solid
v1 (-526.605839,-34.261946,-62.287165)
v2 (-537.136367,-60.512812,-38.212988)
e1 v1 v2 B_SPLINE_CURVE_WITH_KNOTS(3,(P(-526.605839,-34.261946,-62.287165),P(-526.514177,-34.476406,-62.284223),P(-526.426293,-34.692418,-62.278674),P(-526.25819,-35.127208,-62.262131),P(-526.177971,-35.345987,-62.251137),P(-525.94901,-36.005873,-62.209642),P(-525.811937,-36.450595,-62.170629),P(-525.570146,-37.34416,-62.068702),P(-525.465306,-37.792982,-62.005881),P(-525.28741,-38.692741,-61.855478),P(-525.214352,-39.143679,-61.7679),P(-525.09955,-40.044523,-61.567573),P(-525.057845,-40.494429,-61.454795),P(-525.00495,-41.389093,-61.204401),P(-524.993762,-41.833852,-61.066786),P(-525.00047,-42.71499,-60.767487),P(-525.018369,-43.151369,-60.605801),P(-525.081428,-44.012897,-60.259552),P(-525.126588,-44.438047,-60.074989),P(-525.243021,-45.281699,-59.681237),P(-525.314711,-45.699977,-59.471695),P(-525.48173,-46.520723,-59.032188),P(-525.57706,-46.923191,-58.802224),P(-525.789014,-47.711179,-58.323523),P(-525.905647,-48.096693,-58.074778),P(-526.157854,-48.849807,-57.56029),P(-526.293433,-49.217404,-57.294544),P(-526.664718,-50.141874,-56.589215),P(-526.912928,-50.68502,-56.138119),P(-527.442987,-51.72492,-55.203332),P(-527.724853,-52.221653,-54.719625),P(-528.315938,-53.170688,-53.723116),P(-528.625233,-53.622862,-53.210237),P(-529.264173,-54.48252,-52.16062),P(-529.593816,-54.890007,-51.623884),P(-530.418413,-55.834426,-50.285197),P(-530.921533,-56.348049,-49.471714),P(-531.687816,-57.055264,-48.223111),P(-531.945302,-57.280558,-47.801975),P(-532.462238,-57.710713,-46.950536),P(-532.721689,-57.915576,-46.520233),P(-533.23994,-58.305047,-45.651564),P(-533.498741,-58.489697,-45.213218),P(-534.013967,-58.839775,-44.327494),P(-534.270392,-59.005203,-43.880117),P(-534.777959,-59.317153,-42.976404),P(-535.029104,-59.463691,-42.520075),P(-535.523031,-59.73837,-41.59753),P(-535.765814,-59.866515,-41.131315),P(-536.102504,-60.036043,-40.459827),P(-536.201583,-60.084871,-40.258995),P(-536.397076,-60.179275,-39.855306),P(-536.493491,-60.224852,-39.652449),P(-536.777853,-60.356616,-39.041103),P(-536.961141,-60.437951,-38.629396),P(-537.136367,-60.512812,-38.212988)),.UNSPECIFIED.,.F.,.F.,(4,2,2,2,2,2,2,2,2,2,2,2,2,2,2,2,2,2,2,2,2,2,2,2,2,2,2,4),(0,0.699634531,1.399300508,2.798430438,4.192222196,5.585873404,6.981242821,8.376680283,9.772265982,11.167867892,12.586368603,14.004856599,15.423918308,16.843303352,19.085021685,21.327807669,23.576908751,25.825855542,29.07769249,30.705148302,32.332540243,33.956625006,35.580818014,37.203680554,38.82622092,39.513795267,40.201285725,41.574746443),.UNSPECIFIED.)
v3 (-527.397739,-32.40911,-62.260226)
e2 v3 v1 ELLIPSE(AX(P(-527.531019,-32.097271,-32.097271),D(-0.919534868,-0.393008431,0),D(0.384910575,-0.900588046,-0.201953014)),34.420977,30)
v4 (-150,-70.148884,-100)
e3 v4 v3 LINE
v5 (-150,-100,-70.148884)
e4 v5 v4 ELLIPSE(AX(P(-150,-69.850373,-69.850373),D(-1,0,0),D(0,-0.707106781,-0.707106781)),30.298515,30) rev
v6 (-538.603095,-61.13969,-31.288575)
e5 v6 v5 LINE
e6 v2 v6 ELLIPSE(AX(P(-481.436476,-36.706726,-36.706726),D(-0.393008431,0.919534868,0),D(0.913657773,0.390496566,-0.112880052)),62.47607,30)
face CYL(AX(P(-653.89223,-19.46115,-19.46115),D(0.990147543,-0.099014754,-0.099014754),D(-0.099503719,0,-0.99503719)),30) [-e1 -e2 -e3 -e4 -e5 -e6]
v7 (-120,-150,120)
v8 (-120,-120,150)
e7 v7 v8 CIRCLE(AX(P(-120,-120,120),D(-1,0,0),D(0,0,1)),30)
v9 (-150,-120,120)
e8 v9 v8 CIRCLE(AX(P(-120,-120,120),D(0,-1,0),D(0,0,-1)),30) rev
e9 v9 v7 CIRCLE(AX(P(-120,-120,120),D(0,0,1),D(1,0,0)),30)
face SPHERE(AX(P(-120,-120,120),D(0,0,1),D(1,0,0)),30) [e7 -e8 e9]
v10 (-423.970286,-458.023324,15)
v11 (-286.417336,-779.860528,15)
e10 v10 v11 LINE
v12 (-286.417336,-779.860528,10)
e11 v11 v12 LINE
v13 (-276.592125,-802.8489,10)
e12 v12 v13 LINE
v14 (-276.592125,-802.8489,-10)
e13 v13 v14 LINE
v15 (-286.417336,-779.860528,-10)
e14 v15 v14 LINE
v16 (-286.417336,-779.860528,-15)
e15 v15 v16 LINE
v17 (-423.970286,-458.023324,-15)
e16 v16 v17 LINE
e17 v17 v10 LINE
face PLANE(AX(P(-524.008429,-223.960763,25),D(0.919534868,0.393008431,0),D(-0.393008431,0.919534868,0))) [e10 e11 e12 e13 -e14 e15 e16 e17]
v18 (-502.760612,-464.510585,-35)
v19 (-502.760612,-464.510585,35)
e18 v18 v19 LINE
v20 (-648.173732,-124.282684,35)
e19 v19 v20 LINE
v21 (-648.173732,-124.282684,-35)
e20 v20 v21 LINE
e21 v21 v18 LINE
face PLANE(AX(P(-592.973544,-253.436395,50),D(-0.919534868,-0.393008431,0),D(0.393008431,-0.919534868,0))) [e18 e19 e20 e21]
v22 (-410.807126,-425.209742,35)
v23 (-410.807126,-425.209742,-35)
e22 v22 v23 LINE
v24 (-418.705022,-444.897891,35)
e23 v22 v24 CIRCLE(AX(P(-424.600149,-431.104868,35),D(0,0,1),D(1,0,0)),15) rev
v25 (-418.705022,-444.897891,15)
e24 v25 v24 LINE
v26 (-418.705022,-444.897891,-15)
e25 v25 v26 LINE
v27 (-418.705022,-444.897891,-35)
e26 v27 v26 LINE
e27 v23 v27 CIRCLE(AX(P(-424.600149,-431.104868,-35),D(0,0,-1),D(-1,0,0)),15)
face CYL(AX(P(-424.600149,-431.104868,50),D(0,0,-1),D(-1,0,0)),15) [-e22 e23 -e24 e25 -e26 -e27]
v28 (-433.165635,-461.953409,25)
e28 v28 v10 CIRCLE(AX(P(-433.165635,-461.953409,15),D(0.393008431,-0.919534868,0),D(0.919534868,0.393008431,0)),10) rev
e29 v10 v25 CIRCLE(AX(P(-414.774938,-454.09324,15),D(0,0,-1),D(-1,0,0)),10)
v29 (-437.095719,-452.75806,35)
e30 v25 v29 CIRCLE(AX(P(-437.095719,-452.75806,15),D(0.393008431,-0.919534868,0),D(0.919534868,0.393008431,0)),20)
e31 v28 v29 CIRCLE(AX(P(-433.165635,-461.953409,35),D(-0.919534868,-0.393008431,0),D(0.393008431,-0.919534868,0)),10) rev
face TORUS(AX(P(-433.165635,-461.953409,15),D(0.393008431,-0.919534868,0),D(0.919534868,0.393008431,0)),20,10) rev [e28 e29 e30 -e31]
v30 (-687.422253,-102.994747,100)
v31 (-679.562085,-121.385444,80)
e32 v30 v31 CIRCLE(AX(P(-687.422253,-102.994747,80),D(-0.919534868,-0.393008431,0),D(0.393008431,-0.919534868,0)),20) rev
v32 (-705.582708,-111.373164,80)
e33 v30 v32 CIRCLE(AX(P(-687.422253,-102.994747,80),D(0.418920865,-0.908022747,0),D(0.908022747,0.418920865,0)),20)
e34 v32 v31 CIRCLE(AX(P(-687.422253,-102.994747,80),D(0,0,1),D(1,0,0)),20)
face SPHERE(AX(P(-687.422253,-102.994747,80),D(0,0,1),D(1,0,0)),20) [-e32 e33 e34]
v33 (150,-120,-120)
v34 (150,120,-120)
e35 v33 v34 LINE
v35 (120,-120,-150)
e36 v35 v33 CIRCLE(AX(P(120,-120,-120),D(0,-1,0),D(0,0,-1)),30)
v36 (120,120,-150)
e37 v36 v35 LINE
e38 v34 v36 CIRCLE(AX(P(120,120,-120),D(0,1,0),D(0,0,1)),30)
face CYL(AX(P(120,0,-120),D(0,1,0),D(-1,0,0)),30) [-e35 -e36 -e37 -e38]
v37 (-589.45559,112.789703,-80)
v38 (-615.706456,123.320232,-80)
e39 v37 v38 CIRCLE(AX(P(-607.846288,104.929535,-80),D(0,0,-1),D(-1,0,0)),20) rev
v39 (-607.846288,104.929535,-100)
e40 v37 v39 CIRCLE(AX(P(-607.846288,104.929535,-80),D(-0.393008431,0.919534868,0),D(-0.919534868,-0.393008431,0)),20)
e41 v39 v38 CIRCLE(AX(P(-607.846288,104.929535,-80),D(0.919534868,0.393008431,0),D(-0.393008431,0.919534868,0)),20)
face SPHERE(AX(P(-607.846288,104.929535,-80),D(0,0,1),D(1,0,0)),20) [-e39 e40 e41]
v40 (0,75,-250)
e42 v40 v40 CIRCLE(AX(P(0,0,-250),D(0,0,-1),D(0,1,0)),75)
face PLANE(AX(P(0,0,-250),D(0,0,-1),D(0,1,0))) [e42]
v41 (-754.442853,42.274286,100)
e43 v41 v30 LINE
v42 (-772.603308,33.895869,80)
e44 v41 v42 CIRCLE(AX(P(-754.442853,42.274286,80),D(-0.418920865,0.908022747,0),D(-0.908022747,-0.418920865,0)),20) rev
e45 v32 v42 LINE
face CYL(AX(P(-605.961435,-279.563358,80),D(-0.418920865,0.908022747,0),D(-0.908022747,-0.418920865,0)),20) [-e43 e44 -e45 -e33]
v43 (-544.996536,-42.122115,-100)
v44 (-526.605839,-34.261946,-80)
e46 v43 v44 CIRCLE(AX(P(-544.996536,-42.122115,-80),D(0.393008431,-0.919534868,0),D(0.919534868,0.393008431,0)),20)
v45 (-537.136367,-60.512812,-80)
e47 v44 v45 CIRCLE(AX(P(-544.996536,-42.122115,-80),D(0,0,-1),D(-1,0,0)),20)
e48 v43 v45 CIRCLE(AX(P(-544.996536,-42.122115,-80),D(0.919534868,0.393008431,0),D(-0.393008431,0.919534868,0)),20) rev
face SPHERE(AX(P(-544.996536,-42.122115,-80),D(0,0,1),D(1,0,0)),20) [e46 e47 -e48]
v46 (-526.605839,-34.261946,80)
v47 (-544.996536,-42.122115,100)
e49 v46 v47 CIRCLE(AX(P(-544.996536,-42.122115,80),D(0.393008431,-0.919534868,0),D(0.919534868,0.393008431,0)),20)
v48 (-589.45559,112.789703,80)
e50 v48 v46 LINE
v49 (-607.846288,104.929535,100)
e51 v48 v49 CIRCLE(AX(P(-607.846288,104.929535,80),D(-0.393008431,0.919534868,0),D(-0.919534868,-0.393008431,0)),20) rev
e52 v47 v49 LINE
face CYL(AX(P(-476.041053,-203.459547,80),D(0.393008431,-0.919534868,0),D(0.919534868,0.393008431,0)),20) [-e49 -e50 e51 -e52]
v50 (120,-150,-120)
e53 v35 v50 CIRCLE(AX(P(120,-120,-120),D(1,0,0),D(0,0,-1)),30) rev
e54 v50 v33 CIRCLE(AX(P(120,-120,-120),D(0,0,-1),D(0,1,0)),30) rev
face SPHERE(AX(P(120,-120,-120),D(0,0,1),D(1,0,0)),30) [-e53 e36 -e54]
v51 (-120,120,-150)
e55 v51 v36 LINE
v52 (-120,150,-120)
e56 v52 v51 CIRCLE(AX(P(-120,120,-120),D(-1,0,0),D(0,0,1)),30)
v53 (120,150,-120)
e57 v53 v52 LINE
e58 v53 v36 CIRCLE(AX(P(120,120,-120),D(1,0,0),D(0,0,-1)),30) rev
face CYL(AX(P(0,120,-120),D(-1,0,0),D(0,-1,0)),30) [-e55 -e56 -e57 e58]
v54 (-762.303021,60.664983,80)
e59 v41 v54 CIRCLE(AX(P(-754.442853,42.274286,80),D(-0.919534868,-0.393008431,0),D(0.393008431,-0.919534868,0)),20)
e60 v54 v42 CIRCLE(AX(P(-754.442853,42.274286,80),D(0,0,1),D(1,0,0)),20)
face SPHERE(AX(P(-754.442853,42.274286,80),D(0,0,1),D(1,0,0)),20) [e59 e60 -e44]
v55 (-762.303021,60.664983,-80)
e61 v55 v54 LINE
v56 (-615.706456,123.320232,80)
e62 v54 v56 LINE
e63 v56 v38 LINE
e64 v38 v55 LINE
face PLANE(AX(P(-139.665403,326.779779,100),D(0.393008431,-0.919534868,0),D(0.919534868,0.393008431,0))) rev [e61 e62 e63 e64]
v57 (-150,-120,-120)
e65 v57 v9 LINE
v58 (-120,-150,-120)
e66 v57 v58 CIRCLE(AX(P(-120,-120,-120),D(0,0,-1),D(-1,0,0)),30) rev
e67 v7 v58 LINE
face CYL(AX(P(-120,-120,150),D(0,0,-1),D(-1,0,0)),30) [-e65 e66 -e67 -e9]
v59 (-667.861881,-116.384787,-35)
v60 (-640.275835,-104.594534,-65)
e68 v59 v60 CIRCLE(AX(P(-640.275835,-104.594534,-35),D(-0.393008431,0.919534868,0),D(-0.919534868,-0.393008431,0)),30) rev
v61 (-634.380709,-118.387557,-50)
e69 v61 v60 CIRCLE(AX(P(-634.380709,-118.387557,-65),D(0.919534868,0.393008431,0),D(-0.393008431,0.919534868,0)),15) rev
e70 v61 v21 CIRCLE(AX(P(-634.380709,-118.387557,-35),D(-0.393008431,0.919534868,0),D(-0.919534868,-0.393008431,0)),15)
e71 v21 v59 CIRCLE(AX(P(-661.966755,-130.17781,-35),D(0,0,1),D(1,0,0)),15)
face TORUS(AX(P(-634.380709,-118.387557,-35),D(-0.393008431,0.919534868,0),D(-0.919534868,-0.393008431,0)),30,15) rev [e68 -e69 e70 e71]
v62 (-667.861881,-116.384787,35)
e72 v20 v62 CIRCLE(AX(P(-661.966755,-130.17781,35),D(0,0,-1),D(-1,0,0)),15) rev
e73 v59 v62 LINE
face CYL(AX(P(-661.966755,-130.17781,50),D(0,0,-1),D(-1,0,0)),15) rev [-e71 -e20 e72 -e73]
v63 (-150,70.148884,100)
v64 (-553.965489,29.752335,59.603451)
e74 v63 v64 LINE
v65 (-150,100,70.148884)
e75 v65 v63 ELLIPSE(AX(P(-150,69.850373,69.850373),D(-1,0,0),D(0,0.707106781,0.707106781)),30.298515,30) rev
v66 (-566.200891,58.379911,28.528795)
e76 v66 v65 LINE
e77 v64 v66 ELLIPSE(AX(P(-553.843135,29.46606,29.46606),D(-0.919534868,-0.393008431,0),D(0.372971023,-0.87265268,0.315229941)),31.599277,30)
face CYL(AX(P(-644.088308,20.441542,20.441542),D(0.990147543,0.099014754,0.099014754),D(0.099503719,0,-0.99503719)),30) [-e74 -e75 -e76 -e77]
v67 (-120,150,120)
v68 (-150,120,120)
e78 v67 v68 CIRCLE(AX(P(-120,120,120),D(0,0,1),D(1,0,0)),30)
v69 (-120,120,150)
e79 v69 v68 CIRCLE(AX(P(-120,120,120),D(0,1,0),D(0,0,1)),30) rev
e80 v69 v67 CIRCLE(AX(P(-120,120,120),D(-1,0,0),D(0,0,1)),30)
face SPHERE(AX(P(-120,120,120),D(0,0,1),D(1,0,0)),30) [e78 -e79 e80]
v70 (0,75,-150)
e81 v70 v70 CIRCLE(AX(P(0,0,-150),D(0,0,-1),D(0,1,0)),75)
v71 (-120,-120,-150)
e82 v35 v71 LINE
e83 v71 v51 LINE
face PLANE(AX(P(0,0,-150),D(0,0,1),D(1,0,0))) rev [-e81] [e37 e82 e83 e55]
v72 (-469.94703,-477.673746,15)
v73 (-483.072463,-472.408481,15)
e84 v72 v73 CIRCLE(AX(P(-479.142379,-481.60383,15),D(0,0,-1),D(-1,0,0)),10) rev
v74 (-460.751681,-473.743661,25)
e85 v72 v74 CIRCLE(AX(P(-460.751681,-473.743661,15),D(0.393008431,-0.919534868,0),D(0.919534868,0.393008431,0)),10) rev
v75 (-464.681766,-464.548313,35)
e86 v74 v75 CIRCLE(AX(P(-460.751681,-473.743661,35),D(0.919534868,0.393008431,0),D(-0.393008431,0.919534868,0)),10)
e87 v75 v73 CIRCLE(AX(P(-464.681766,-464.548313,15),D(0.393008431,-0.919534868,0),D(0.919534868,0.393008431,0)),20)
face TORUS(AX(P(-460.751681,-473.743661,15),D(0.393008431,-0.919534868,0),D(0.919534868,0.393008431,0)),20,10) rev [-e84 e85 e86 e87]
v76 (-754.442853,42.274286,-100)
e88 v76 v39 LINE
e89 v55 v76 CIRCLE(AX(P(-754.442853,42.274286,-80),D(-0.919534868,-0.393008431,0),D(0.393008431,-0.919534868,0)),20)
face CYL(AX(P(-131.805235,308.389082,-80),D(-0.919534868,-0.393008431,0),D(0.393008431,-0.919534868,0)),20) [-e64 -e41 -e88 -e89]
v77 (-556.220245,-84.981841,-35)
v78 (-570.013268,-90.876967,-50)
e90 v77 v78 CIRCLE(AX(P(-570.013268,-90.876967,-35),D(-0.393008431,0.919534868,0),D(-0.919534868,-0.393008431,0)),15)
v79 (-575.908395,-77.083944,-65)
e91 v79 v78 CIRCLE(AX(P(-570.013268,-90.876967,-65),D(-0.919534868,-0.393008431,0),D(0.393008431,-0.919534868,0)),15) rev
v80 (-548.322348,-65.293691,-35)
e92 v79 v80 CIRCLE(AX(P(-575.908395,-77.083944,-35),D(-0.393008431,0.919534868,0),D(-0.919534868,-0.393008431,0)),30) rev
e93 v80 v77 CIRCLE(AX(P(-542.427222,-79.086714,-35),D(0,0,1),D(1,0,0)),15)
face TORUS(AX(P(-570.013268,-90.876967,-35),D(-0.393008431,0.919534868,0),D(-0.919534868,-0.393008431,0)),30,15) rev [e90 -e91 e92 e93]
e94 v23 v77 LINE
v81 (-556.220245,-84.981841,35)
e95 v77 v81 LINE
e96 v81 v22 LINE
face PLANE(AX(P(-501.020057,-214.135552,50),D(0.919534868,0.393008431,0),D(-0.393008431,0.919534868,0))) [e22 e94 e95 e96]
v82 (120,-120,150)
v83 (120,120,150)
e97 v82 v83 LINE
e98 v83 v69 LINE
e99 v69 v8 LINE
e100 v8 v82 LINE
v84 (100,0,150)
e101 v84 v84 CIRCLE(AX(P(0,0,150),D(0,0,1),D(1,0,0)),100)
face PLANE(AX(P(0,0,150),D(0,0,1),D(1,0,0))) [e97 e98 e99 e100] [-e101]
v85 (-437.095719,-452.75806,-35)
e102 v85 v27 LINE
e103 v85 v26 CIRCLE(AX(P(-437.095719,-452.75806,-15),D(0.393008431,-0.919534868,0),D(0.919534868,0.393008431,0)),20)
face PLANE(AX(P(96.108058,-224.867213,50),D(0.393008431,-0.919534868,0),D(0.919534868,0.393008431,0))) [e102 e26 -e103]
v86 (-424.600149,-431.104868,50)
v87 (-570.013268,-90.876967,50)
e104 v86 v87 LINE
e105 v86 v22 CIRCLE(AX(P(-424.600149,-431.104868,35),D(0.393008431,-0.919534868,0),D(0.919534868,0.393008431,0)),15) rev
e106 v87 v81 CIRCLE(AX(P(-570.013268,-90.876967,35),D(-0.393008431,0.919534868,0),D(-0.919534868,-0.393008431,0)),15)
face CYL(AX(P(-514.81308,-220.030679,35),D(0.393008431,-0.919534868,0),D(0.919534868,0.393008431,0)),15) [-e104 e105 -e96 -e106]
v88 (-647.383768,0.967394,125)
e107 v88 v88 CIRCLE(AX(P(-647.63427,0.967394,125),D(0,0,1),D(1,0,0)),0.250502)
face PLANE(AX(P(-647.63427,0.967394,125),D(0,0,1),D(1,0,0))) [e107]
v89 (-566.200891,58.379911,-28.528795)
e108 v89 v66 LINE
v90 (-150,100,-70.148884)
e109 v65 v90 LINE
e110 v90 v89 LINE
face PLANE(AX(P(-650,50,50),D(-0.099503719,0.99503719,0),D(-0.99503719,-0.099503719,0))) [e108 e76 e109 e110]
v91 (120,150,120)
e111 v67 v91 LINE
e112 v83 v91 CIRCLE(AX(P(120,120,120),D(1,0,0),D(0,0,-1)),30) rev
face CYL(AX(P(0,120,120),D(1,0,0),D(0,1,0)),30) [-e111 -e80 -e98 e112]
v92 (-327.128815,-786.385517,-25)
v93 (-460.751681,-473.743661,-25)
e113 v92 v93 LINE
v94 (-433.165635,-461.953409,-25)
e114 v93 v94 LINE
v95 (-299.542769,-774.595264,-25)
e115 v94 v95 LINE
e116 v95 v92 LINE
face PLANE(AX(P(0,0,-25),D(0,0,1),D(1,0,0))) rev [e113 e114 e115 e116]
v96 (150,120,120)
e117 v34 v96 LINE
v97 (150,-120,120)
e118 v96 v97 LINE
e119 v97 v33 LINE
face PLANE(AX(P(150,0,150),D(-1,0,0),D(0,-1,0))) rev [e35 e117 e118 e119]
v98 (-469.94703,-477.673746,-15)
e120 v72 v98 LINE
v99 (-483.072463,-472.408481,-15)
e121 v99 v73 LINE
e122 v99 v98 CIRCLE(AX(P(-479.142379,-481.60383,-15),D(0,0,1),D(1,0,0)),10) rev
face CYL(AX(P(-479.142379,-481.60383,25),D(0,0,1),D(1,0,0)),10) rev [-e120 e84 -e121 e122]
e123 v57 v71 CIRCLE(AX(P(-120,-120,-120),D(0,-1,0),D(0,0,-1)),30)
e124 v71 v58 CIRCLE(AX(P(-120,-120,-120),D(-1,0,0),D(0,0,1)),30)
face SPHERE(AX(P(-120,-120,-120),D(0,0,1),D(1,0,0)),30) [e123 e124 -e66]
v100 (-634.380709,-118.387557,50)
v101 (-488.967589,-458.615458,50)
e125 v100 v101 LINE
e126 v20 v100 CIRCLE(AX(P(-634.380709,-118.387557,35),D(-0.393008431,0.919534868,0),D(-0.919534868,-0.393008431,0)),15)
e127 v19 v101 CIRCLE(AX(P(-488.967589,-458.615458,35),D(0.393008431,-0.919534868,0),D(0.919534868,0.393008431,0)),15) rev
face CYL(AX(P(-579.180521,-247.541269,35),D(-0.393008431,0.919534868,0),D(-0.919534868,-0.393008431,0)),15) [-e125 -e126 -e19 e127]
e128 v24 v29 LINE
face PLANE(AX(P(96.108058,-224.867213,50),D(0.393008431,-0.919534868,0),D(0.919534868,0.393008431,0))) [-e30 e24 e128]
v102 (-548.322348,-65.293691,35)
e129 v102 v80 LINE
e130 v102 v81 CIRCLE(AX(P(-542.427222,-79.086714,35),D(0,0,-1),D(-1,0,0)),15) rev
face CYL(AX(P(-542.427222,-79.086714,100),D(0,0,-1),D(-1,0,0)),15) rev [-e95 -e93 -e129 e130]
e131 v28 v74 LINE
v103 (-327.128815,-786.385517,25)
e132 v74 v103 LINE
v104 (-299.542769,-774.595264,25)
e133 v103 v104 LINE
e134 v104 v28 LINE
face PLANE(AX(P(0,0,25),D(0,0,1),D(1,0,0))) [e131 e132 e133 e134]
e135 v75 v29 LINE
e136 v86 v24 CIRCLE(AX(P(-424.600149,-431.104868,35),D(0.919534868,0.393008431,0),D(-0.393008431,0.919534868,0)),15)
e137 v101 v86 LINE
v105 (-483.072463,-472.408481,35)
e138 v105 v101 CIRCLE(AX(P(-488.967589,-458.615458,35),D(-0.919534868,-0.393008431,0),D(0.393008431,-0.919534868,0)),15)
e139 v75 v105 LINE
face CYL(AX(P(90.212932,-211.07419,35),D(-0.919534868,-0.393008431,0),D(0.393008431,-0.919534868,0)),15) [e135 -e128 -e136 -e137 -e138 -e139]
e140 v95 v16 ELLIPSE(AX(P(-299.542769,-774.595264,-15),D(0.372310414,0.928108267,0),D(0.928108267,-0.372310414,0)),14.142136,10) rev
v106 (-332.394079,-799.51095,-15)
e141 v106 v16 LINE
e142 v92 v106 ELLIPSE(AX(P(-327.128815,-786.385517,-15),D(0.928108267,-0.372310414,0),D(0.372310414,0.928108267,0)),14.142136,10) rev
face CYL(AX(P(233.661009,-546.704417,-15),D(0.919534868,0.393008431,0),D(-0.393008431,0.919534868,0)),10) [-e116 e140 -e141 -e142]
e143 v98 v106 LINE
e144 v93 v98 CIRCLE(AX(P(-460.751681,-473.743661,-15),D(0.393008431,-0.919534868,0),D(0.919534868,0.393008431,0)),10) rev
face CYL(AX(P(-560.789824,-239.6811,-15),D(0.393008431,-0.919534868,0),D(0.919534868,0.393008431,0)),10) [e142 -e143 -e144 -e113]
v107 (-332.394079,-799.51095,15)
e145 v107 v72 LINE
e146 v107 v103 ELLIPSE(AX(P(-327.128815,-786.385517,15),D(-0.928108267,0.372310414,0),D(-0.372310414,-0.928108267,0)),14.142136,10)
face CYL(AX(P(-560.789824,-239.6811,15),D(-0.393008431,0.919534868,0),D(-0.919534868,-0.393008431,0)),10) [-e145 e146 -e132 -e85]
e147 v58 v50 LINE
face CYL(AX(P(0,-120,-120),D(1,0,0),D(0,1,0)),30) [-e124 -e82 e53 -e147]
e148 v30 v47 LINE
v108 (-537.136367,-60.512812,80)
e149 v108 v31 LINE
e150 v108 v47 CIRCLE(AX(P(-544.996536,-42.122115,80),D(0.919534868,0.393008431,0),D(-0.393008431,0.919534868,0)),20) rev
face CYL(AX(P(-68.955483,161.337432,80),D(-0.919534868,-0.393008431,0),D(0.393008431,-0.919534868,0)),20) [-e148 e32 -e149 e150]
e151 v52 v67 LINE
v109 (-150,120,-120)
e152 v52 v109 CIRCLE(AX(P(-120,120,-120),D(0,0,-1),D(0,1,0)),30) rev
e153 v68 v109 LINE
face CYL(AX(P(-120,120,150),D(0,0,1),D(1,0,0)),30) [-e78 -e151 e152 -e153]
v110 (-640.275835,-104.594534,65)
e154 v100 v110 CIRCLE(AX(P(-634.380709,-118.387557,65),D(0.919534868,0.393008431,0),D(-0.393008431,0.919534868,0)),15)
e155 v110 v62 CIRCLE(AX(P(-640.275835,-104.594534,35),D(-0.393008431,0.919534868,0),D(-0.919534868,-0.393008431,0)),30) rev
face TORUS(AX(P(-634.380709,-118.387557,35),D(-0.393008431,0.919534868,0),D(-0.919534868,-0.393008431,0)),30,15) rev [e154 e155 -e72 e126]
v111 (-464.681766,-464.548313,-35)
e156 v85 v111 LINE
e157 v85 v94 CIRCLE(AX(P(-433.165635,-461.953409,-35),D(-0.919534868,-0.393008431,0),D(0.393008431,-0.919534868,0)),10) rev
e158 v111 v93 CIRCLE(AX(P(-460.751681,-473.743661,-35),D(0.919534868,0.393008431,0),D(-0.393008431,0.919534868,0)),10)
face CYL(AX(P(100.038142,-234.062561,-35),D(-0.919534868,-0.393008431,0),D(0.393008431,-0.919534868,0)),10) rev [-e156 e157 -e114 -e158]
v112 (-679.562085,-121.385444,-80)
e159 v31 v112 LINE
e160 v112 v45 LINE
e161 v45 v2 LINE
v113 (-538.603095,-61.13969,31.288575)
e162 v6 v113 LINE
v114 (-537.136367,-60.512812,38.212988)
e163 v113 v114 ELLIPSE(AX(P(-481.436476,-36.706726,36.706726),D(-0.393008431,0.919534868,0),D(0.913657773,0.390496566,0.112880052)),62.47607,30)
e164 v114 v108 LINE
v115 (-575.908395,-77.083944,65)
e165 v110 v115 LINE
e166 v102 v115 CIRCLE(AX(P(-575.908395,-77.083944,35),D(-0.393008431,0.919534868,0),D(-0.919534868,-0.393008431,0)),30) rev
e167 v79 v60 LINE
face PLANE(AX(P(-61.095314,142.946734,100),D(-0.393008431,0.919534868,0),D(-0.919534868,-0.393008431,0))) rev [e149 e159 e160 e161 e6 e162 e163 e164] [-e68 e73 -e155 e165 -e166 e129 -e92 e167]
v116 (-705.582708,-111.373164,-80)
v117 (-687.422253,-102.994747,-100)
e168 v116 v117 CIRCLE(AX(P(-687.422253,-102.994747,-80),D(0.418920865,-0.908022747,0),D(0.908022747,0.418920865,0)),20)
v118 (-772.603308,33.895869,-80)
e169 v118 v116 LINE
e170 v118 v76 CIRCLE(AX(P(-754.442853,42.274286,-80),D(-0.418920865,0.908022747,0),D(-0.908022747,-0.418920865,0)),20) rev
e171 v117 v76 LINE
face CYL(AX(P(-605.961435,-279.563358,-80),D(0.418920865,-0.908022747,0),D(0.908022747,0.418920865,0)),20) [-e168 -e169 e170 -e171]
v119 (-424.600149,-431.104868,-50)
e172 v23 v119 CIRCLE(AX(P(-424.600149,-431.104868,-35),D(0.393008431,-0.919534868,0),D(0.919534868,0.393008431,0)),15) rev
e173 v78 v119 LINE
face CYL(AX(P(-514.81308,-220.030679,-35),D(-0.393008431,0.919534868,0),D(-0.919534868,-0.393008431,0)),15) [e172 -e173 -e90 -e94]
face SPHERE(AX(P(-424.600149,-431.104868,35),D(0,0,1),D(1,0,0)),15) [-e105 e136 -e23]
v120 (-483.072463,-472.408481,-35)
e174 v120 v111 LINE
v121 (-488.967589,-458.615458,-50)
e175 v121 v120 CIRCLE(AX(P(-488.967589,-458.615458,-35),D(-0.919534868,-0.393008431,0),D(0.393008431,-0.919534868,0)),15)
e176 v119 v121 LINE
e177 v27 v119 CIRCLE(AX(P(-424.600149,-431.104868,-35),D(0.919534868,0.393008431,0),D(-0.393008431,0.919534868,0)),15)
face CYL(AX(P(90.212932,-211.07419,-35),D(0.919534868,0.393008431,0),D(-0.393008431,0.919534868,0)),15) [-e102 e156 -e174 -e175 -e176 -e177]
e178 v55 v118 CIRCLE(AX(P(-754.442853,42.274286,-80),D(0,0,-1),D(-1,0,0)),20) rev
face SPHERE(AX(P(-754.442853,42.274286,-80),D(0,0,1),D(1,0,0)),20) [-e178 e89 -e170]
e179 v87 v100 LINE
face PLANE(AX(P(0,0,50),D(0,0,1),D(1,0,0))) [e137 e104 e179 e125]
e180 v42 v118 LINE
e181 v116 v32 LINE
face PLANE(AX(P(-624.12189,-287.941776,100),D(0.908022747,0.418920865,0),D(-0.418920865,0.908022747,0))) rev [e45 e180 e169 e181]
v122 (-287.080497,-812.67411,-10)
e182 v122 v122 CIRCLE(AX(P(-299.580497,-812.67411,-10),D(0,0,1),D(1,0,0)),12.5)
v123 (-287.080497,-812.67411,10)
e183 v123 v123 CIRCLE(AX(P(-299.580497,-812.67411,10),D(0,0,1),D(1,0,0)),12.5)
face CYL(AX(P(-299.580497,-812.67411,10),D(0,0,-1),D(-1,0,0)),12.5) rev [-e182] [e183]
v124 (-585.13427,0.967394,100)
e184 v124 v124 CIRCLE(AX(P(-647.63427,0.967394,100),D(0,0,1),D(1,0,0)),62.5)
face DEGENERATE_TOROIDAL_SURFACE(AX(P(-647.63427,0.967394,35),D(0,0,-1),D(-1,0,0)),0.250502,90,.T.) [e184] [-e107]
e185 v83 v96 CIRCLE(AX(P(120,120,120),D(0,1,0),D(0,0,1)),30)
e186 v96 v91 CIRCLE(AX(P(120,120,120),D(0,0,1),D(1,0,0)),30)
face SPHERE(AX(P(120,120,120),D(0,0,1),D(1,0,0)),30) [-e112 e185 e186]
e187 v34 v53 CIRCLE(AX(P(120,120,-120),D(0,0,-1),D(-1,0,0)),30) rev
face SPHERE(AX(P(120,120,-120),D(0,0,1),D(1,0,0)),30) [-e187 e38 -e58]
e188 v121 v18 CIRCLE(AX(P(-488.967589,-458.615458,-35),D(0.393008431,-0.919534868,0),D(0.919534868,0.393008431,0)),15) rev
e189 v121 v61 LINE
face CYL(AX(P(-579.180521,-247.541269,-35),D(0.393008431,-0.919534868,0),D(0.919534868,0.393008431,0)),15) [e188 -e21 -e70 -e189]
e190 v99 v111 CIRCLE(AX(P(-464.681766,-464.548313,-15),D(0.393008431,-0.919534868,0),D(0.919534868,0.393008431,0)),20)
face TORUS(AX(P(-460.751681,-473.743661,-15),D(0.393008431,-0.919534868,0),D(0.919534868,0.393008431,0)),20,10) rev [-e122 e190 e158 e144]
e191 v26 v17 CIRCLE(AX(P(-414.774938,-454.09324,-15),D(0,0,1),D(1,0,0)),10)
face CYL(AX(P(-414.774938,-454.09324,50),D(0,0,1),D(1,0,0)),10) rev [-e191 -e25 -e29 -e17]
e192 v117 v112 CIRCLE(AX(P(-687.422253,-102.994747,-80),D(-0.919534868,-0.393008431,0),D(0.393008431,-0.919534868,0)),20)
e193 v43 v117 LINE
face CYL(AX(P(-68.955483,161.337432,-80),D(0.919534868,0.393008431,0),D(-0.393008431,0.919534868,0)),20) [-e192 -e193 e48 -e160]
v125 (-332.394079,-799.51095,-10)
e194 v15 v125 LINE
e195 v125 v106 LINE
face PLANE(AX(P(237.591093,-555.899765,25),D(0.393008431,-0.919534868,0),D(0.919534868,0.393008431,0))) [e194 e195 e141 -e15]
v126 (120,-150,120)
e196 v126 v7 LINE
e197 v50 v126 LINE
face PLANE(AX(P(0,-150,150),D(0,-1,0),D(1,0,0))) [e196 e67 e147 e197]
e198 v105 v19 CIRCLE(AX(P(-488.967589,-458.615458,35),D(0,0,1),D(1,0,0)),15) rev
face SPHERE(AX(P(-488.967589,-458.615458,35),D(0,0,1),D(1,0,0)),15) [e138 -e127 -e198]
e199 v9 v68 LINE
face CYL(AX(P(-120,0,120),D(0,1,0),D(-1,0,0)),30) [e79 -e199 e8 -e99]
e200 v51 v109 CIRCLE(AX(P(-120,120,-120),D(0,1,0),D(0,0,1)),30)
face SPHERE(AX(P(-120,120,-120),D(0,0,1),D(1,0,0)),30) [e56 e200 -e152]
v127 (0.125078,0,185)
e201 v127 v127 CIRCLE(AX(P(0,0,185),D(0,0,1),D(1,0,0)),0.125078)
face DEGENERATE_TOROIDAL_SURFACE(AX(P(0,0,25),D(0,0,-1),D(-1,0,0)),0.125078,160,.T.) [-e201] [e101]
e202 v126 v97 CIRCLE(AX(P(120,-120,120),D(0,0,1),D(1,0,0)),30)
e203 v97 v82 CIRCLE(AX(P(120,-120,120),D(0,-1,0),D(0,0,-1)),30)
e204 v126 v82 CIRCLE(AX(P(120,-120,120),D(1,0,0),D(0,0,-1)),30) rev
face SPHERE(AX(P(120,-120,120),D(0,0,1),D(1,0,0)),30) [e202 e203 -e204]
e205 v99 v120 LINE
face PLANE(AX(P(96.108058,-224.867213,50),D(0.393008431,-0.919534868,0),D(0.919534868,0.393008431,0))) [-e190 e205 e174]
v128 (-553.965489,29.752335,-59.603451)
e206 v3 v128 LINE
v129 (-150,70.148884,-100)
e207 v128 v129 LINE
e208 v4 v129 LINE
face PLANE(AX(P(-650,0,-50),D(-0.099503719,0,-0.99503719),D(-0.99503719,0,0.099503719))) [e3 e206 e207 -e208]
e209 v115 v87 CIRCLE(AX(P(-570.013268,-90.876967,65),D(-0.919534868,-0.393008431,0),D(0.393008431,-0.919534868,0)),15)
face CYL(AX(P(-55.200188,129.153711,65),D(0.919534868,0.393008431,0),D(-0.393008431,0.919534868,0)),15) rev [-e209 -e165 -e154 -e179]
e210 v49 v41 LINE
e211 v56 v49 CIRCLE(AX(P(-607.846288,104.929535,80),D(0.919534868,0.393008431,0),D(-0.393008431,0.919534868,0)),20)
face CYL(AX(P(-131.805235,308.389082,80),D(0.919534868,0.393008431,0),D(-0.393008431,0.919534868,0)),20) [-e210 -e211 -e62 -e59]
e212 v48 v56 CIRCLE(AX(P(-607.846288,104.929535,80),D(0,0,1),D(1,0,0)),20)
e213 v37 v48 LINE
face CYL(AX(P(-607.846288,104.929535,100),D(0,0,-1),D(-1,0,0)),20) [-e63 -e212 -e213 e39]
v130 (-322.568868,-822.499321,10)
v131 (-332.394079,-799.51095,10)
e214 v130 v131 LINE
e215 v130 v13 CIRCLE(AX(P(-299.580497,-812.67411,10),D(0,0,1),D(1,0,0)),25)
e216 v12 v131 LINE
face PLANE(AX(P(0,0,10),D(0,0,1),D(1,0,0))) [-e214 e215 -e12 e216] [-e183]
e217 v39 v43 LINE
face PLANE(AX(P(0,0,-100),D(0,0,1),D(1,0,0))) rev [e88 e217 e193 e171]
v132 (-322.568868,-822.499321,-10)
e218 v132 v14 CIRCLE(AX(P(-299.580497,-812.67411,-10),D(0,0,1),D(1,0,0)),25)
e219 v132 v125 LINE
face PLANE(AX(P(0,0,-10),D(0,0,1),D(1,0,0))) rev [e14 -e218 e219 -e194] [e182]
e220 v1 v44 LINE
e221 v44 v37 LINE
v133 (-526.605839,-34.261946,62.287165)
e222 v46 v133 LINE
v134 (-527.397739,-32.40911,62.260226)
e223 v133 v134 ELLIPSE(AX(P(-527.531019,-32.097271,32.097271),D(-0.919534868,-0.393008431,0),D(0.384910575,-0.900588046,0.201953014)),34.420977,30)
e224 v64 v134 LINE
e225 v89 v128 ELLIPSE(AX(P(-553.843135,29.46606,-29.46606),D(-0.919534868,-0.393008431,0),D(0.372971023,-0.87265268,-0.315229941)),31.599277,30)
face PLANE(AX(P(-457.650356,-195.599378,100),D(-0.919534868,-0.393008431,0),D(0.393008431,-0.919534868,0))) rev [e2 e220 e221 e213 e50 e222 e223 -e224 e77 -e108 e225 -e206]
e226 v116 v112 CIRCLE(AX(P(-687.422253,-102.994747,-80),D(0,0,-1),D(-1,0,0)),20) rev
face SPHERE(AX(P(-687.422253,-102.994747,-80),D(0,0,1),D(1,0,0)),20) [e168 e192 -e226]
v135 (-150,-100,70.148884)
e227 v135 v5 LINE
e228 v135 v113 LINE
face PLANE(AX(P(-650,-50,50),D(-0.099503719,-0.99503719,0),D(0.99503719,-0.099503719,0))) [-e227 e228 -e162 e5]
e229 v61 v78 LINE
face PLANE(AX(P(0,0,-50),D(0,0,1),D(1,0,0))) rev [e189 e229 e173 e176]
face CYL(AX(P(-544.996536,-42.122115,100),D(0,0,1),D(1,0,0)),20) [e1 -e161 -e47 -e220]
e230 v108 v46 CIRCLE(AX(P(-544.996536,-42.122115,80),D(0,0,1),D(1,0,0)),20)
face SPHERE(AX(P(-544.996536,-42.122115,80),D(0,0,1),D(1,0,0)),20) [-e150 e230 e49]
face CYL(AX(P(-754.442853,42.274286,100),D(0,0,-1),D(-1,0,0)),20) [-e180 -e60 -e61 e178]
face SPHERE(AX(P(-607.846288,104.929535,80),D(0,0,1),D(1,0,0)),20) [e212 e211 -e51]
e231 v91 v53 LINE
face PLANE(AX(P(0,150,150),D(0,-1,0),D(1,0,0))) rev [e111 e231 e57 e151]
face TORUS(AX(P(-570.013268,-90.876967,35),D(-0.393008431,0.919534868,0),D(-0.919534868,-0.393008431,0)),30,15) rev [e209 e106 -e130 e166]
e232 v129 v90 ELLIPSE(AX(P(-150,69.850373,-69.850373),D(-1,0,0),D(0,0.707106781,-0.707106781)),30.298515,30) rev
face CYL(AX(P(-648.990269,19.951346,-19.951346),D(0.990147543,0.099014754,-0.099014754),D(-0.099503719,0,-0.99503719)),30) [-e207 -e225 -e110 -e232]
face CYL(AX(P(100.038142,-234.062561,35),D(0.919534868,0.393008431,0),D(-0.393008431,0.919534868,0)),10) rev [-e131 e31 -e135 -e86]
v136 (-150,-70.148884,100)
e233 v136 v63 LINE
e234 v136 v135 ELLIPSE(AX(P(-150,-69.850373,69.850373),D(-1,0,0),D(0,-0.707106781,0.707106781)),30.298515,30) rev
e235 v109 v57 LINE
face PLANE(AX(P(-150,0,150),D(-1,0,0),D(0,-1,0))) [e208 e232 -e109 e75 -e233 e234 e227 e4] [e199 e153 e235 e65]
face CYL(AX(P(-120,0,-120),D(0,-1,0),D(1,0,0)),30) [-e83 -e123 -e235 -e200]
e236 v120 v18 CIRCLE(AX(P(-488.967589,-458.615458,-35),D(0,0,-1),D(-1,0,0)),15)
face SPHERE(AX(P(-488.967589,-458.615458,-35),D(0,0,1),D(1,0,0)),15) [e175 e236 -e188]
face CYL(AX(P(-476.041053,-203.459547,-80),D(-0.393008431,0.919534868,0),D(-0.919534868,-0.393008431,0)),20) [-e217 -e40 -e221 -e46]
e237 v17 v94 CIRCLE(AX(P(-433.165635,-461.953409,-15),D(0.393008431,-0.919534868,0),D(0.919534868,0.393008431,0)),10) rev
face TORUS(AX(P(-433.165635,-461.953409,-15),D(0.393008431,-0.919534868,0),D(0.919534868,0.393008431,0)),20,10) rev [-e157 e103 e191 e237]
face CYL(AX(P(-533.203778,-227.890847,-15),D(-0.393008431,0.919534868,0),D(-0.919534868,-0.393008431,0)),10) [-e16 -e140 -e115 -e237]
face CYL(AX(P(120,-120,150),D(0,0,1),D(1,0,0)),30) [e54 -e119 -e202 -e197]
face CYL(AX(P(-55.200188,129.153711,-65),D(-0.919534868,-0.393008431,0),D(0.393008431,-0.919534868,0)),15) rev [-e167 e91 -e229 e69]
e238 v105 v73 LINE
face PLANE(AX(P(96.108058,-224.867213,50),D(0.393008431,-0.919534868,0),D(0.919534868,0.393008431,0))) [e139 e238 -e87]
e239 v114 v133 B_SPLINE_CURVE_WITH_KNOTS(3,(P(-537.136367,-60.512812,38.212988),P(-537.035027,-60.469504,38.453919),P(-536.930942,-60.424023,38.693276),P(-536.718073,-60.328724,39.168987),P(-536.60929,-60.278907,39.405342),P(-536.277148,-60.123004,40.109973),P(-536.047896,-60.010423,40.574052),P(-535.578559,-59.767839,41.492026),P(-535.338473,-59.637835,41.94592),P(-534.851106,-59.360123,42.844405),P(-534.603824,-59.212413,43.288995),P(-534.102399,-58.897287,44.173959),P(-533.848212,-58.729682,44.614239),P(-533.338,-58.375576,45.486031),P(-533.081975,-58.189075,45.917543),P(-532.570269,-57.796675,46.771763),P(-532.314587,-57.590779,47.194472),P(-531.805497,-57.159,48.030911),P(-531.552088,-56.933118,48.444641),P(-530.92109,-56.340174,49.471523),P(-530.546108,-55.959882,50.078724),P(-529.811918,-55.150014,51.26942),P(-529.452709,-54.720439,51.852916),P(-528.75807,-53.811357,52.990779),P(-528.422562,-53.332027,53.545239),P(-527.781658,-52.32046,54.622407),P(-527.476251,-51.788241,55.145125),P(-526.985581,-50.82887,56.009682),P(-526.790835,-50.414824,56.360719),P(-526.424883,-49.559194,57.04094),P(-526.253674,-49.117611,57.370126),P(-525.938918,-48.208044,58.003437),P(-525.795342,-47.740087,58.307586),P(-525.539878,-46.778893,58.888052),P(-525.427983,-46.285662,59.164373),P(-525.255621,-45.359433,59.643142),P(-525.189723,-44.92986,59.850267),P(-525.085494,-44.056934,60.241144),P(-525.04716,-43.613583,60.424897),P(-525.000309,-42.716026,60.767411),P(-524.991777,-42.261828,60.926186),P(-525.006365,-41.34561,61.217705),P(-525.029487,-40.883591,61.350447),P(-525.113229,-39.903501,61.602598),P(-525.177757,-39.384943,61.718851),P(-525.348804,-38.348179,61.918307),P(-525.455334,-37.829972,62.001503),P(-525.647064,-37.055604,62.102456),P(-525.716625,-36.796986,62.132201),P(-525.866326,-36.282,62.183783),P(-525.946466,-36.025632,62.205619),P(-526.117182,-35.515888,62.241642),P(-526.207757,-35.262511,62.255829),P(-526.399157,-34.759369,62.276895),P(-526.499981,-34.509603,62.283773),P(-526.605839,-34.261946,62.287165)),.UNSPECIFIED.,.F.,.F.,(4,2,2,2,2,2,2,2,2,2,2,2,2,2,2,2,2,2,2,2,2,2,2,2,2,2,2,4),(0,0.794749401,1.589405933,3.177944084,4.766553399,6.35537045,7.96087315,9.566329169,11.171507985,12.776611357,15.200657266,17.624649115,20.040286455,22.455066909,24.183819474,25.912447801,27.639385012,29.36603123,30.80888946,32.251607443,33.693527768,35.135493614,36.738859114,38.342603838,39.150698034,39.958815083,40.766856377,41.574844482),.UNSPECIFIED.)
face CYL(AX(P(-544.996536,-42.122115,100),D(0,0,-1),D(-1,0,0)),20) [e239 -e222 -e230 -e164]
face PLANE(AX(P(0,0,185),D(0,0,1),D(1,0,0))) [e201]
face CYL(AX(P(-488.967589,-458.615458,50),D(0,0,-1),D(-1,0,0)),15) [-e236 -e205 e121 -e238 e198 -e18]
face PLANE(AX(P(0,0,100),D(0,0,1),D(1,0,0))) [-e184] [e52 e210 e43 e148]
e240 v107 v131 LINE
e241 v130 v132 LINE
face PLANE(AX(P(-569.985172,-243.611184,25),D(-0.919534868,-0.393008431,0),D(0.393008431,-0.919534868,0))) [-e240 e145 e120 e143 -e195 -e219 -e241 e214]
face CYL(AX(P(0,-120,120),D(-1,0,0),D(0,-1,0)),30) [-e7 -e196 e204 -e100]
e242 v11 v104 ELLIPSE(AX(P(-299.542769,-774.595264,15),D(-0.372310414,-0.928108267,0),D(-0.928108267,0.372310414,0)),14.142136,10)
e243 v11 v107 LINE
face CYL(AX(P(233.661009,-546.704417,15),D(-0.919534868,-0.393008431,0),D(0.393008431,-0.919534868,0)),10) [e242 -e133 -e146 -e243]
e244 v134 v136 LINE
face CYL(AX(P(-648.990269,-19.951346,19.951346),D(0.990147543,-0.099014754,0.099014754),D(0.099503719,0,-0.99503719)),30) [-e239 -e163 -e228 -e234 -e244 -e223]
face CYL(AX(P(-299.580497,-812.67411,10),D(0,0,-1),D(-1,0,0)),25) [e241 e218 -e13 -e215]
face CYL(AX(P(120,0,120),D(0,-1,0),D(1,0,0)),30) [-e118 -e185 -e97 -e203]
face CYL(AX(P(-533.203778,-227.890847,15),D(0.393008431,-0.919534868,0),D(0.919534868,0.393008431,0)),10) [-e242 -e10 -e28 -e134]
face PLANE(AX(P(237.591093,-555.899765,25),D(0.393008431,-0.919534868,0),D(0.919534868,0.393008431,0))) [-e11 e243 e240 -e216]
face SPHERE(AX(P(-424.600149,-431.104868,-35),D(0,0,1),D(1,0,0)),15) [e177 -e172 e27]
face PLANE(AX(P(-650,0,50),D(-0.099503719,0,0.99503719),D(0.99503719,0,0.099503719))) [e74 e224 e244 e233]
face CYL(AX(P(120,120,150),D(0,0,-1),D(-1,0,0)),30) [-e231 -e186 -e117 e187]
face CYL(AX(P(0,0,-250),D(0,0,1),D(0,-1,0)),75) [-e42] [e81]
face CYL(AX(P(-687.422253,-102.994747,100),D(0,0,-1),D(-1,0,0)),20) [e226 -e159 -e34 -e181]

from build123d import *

# Parameters (mm, degrees)
BOSS_EXTRUDE3_DEPTH  = 50
BOSS_EXTRUDE4_DEPTH  = 50
BOSS_EXTRUDE5_DEPTH  = 150
BOSS_EXTRUDE6_DEPTH  = 150
BOSS_EXTRUDE7_DEPTH  = 100
BOSS_EXTRUDE8_DEPTH  = 100
SKETCH4_R            = 75.00000000000001
BOSS_EXTRUDE9_DEPTH  = 100
BOSS_EXTRUDE12_DEPTH = 50
BOSS_EXTRUDE13_DEPTH = 50
BOSS_EXTRUDE16_DEPTH = 25
BOSS_EXTRUDE17_DEPTH = 25
BOSS_EXTRUDE18_DEPTH = 10
BOSS_EXTRUDE19_START = -10
BOSS_EXTRUDE19_DEPTH = 10
FILLET2_R            = 10
FILLET4_R            = 15
FILLET5_R            = 20
FILLET6_R            = 30
FILLET7_R            = 30
SKETCH5_R            = 62.500000000000014
BOSS_EXTRUDE20_DEPTH = 25
FILLET8_R            = 90
SKETCH6_R            = 100
BOSS_EXTRUDE21_DEPTH = 35
FILLET9_R            = 160


with BuildPart() as part:
    # Sketch2 → Boss-Extrude3 (new body)
    with BuildSketch(Plane.XY):
        Polygon((-519.8794078050754, -50), (-150, -49.999999999999986), (-149.99999999999997, 50), (-562.6193238983217, 50), align=None)
        Polygon((-650, -50.00000000000001), (-519.8794078050754, -50), (-562.6193238983217, 50), (-650, 49.99999999999999), align=None)
    extrude(amount=BOSS_EXTRUDE3_DEPTH)

    # Sketch2<5> → Boss-Extrude4 (add)
    with BuildSketch(Plane.XY):
        Polygon((-519.8794078050754, -50), (-150, -49.999999999999986), (-149.99999999999997, 50), (-562.6193238983217, 50), align=None)
        Polygon((-650, -50.00000000000001), (-519.8794078050754, -50), (-562.6193238983217, 50), (-650, 49.99999999999999), align=None)
    extrude(amount=-BOSS_EXTRUDE4_DEPTH)

    # Draft2: read off the stored shape, not the designer's step
    # Draft2: loft between two sections, ruled curve by curve
    draft2_from = [
        Edge.make_line((-150, 100, 100), (-150, 100, -100)),
        Edge.make_line((-150, -100, -100), (-150, -100, 100)),
        Edge.make_line((-150, 100, 100), (-150, -100, 100)),
        Edge.make_line((-150, 100, -100), (-150, -100, -100)),
    ]
    draft2_to = [
        Edge.make_line((-650, 50, 50), (-650, 50, -50)),
        Edge.make_line((-650, -50, -50), (-650, -50, 50)),
        Edge.make_line((-650, 50, 50), (-650, -50, 50)),
        Edge.make_line((-650, 50, -50), (-650, -50, -50)),
    ]
    draft2 = Solid(Shell([*[Face.make_surface_from_curves(draft2_from[k], draft2_to[k]) for k in range(4)], Face(Wire(draft2_from)), Face(Wire(draft2_to))]))
    add(draft2)

    # Sketch2<6> → Boss-Extrude5 (add)
    with BuildSketch(Plane.XY):
        Polygon((-150, -150), (-149.99999999999997, 150), (149.99999999999997, 150.00000000000003), (150, -149.99999999999997), align=None)
    extrude(amount=BOSS_EXTRUDE5_DEPTH)

    # Sketch2<7> → Boss-Extrude6 (add)
    with BuildSketch(Plane.XY):
        Polygon((-150, -150), (-149.99999999999997, 150), (149.99999999999997, 150.00000000000003), (150, -149.99999999999997), align=None)
    extrude(amount=-BOSS_EXTRUDE6_DEPTH)

    # Sketch2<8> → Boss-Extrude7 (add)
    with BuildSketch(Plane.XY):
        Polygon((-518.7456701184896, -52.65264368819146), (-519.8794078050754, -49.99999999999999), (-650, -50.00000000000001), (-650, 49.99999999999999), (-562.6193238983217, 50), (-597.3157590953267, 131.18040082555925), (-781.2227326650285, 52.57871463224018), (-697.4385596485628, -129.02583473794203), (-654.0688582759504, -110.48966076139602), (-562.1153714910995, -71.18881766473643), align=None)
        Polygon((-650, -50.00000000000001), (-519.8794078050754, -50), (-562.6193238983217, 50), (-650, 49.99999999999999), align=None)
    extrude(amount=BOSS_EXTRUDE7_DEPTH)

    # Sketch2<9> → Boss-Extrude8 (add)
    with BuildSketch(Plane.XY):
        Polygon((-518.7456701184896, -52.65264368819146), (-519.8794078050754, -49.99999999999999), (-650, -50.00000000000001), (-650, 49.99999999999999), (-562.6193238983217, 50), (-597.3157590953267, 131.18040082555925), (-781.2227326650285, 52.57871463224018), (-697.4385596485628, -129.02583473794203), (-654.0688582759504, -110.48966076139602), (-562.1153714910995, -71.18881766473643), align=None)
        Polygon((-650, -50.00000000000001), (-519.8794078050754, -50), (-562.6193238983217, 50), (-650, 49.99999999999999), align=None)
    extrude(amount=-BOSS_EXTRUDE8_DEPTH)

    # Sketch4 → Boss-Extrude9 (add)
    with BuildSketch(Plane(origin=(0, 1.04744e-12, -149.99999999999983), x_dir=(-1, 0, 0), z_dir=(0, 6.98e-15, -1))):
        with Locations(Location((0, 0, 0), (0, 0, 90))):
            Circle(SKETCH4_R)
    extrude(amount=BOSS_EXTRUDE9_DEPTH)

    # Sketch2<10> → Boss-Extrude12 (add)
    with BuildSketch(Plane.XY):
        Polygon((-404.91199910446187, -439.00276480414016), (-562.1153714910995, -71.1888176647364), (-654.0688582759504, -110.48966076139602), (-496.8654858893127, -478.3036079007997), (-473.8771141930994, -468.47839712663455), (-427.900370800674, -448.8279755783048), align=None)
    extrude(amount=BOSS_EXTRUDE12_DEPTH)

    # Sketch2<11> → Boss-Extrude13 (add)
    with BuildSketch(Plane.XY):
        Polygon((-404.91199910446187, -439.00276480414016), (-562.1153714910995, -71.1888176647364), (-654.0688582759504, -110.48966076139602), (-496.8654858893127, -478.3036079007997), (-473.8771141930994, -468.47839712663455), (-427.900370800674, -448.8279755783048), align=None)
    extrude(amount=-BOSS_EXTRUDE13_DEPTH)

    # Sketch2<16> → Boss-Extrude16 (add)
    with BuildSketch(Plane.XY):
        Polygon((-286.4173356526999, -779.8605280037665), (-427.90037080067407, -448.8279755783047), (-473.8771141930994, -468.47839712663455), (-332.3940790451254, -799.5109495520962), (-309.4057065781073, -789.6857384484898), align=None)
    extrude(amount=BOSS_EXTRUDE16_DEPTH)

    # Sketch2<17> → Boss-Extrude17 (add)
    with BuildSketch(Plane.XY):
        Polygon((-286.4173356526999, -779.8605280037665), (-427.90037080067407, -448.8279755783047), (-473.8771141930994, -468.47839712663455), (-332.3940790451254, -799.5109495520962), (-309.4057065781073, -789.6857384484898), align=None)
    extrude(amount=-BOSS_EXTRUDE17_DEPTH)

    # Sketch2<18> → Boss-Extrude18 (add)
    with BuildSketch(Plane.XY):
        with BuildLine():
            ThreePointArc((-274.58049657474714, -812.6741104741453), (-275.0885663485959, -807.6595961609399), (-276.59212487853443, -802.8488996999804))
            Line((-276.59212487853443, -802.8488996999804), (-288.0863107266407, -807.7615050870628))
            ThreePointArc((-288.086310726641, -807.7615050870623), (-287.3345314616716, -810.1668533175424), (-287.08049657474714, -812.6741104741453))
            ThreePointArc((-287.08049657474714, -812.6741104741453), (-297.07323941814474, -824.9200755872209), (-311.0746824228537, -817.5867158612273))
            Line((-311.07468242285347, -817.5867158612277), (-322.5688682709599, -822.4993212483103))
            ThreePointArc((-322.56886827095985, -822.4993212483103), (-294.5659822615418, -837.1660407002965), (-274.58049657474714, -812.6741104741453))
        make_face()
        with BuildLine():
            Line((-288.0863107266407, -807.7615050870628), (-276.59212487853443, -802.8488996999804))
            ThreePointArc((-276.59212487853443, -802.8488996999804), (-290.27273583592137, -789.471403950363), (-309.40570657810673, -789.6857384484911))
            ThreePointArc((-309.40570657810673, -789.6857384484911), (-322.78320309852955, -803.3663497353195), (-322.56886827095985, -822.4993212483103))
            Line((-322.5688682709599, -822.4993212483103), (-311.07468242285347, -817.5867158612277))
            ThreePointArc((-311.0746824228537, -817.5867158612273), (-304.4931019618296, -801.179924626039), (-288.086310726641, -807.7615050870623))
        make_face()
        with BuildLine():
            Line((-309.4057065781073, -789.6857384484898), (-332.39407904512547, -799.5109495520962))
            Line((-332.3940790451254, -799.5109495520962), (-322.5688682709599, -822.4993212483103))
            ThreePointArc((-322.56886827095985, -822.4993212483103), (-322.78320309852955, -803.3663497353195), (-309.40570657810673, -789.6857384484911))
        make_face()
        with BuildLine():
            Line((-276.59212487853443, -802.8488996999804), (-286.4173356526999, -779.8605280037665))
            Line((-286.4173356526999, -779.8605280037665), (-309.4057065781073, -789.6857384484898))
            ThreePointArc((-309.40570657810673, -789.6857384484911), (-290.27273583592137, -789.471403950363), (-276.59212487853443, -802.8488996999804))
        make_face()
        with BuildLine():
            ThreePointArc((-274.58049657474714, -812.6741104741453), (-275.0885663485959, -807.6595961609399), (-276.59212487853443, -802.8488996999804))
            Line((-276.59212487853443, -802.8488996999804), (-288.0863107266407, -807.7615050870628))
            ThreePointArc((-288.086310726641, -807.7615050870623), (-287.3345314616716, -810.1668533175424), (-287.08049657474714, -812.6741104741453))
            ThreePointArc((-287.08049657474714, -812.6741104741453), (-297.07323941814474, -824.9200755872209), (-311.0746824228537, -817.5867158612273))
            Line((-311.07468242285347, -817.5867158612277), (-322.5688682709599, -822.4993212483103))
            ThreePointArc((-322.56886827095985, -822.4993212483103), (-294.5659822615418, -837.1660407002965), (-274.58049657474714, -812.6741104741453))
        make_face()
        with BuildLine():
            Line((-288.0863107266407, -807.7615050870628), (-276.59212487853443, -802.8488996999804))
            ThreePointArc((-276.59212487853443, -802.8488996999804), (-290.27273583592137, -789.471403950363), (-309.40570657810673, -789.6857384484911))
            ThreePointArc((-309.40570657810673, -789.6857384484911), (-322.78320309852955, -803.3663497353195), (-322.56886827095985, -822.4993212483103))
            Line((-322.5688682709599, -822.4993212483103), (-311.07468242285347, -817.5867158612277))
            ThreePointArc((-311.0746824228537, -817.5867158612273), (-304.4931019618296, -801.179924626039), (-288.086310726641, -807.7615050870623))
        make_face()
    extrude(amount=BOSS_EXTRUDE18_DEPTH)

    # Sketch2<20> → Boss-Extrude19 (add)
    with BuildSketch(Plane.XY.offset(BOSS_EXTRUDE19_START)):
        with BuildLine():
            Line((-309.4057065781073, -789.6857384484898), (-332.39407904512547, -799.5109495520962))
            Line((-332.3940790451254, -799.5109495520962), (-322.5688682709599, -822.4993212483103))
            ThreePointArc((-322.56886827095985, -822.4993212483103), (-322.78320309852955, -803.3663497353195), (-309.40570657810673, -789.6857384484911))
        make_face()
        with BuildLine():
            ThreePointArc((-274.58049657474714, -812.6741104741453), (-275.0885663485959, -807.6595961609399), (-276.59212487853443, -802.8488996999804))
            Line((-276.59212487853443, -802.8488996999804), (-288.0863107266407, -807.7615050870628))
            ThreePointArc((-288.086310726641, -807.7615050870623), (-287.3345314616716, -810.1668533175424), (-287.08049657474714, -812.6741104741453))
            ThreePointArc((-287.08049657474714, -812.6741104741453), (-297.07323941814474, -824.9200755872209), (-311.0746824228537, -817.5867158612273))
            Line((-311.07468242285347, -817.5867158612277), (-322.5688682709599, -822.4993212483103))
            ThreePointArc((-322.56886827095985, -822.4993212483103), (-294.5659822615418, -837.1660407002965), (-274.58049657474714, -812.6741104741453))
        make_face()
        with BuildLine():
            Line((-288.0863107266407, -807.7615050870628), (-276.59212487853443, -802.8488996999804))
            ThreePointArc((-276.59212487853443, -802.8488996999804), (-290.27273583592137, -789.471403950363), (-309.40570657810673, -789.6857384484911))
            ThreePointArc((-309.40570657810673, -789.6857384484911), (-322.78320309852955, -803.3663497353195), (-322.56886827095985, -822.4993212483103))
            Line((-322.5688682709599, -822.4993212483103), (-311.07468242285347, -817.5867158612277))
            ThreePointArc((-311.0746824228537, -817.5867158612273), (-304.4931019618296, -801.179924626039), (-288.086310726641, -807.7615050870623))
        make_face()
        with BuildLine():
            ThreePointArc((-274.58049657474714, -812.6741104741453), (-275.0885663485959, -807.6595961609399), (-276.59212487853443, -802.8488996999804))
            Line((-276.59212487853443, -802.8488996999804), (-288.0863107266407, -807.7615050870628))
            ThreePointArc((-288.086310726641, -807.7615050870623), (-287.3345314616716, -810.1668533175424), (-287.08049657474714, -812.6741104741453))
            ThreePointArc((-287.08049657474714, -812.6741104741453), (-297.07323941814474, -824.9200755872209), (-311.0746824228537, -817.5867158612273))
            Line((-311.07468242285347, -817.5867158612277), (-322.5688682709599, -822.4993212483103))
            ThreePointArc((-322.56886827095985, -822.4993212483103), (-294.5659822615418, -837.1660407002965), (-274.58049657474714, -812.6741104741453))
        make_face()
        with BuildLine():
            Line((-288.0863107266407, -807.7615050870628), (-276.59212487853443, -802.8488996999804))
            ThreePointArc((-276.59212487853443, -802.8488996999804), (-290.27273583592137, -789.471403950363), (-309.40570657810673, -789.6857384484911))
            ThreePointArc((-309.40570657810673, -789.6857384484911), (-322.78320309852955, -803.3663497353195), (-322.56886827095985, -822.4993212483103))
            Line((-322.5688682709599, -822.4993212483103), (-311.07468242285347, -817.5867158612277))
            ThreePointArc((-311.0746824228537, -817.5867158612273), (-304.4931019618296, -801.179924626039), (-288.086310726641, -807.7615050870623))
        make_face()
        with BuildLine():
            Line((-276.59212487853443, -802.8488996999804), (-286.4173356526999, -779.8605280037665))
            Line((-286.4173356526999, -779.8605280037665), (-309.4057065781073, -789.6857384484898))
            ThreePointArc((-309.40570657810673, -789.6857384484911), (-290.27273583592137, -789.471403950363), (-276.59212487853443, -802.8488996999804))
        make_face()
    extrude(amount=BOSS_EXTRUDE19_DEPTH)

    # Fillet2
    fillet2_edges = [part.edges().sort_by_distance(p)[0] for p in [
        (-309.40570734891264, -789.6857387779314, 25),
        (-357.158853226687, -614.3442517910356, 25),
        (-427.90037080067407, -448.82797557830474, 0),
        (-403.1355966191124, -633.9946733393654, 25),
        (-473.8771141930994, -468.4783971266345, 0),
        (-450.8887424968867, -458.6531863524697, 25),
        (-450.8887424968867, -458.6531863524697, -25),
        (-309.40570734891264, -789.6857387779314, -25),
        (-403.1355966191124, -633.9946733393654, -25),
        (-357.158853226687, -614.3442517910356, -25),
    ]]
    fillet(fillet2_edges, radius=FILLET2_R)

    # Fillet4
    fillet4_edges = [part.edges().sort_by_distance(p)[0] for p in [
        (-483.5136852977807, -255.09579123443828, 50),
        (-404.91199910446187, -439.00276480414016, 0),
        (-608.092114883525, -90.83923921306624, 50),
        (-562.1153714910995, -71.18881766473642, 0),
        (-575.4671720826316, -294.39663433109786, 50),
        (-654.0688582759504, -110.48966076139598, 0),
        (-450.8887424968873, -458.6531863524699, 50),
        (-496.8654858893127, -478.3036079007997, 0),
        (-483.5136852977807, -255.09579123443828, -50),
        (-450.8887424968873, -458.6531863524699, -50),
        (-575.4671720826316, -294.39663433109786, -50),
        (-608.092114883525, -90.83923921306624, -50),
    ]]
    fillet(fillet4_edges, radius=FILLET4_R - 0.0001)  # a hair under: the kernel refuses the full size

    # Fillet5
    fillet5_edges = [part.edges().sort_by_distance(p)[0] for p in [
        (-697.4385596485628, -129.02583473794203, 0),
        (-518.7456701184896, -52.65264368819146, 81.56271649407552),
        (-597.3157590953267, 131.18040082555925, 0),
        (-781.2227326650285, 52.57871463224018, 0),
        (-558.0307146069081, 39.26387856868389, 100),
        (-689.2692458801776, 91.8795577288997, 100),
        (-739.3306461567956, -38.22356005285092, 100),
        (-608.0921148835262, -90.83923921306675, 100),
        (-608.0921148835262, -90.83923921306675, -100),
        (-518.7456701184896, -52.65264368819146, -81.56271649407552),
        (-558.0307146069081, 39.26387856868389, -100),
        (-739.3306461567956, -38.22356005285092, -100),
        (-689.2692458801776, 91.8795577288997, -100),
    ]]
    fillet(fillet5_edges, radius=FILLET5_R)

    # Fillet6
    fillet6_edges = [part.edges().sort_by_distance(p)[0] for p in [
        (-358.1004453972281, 79.18995546027719, 79.18995546027719),
        (-344.3015475750585, -80.56984524249415, 80.56984524249415),
        (-344.3015475750585, -80.56984524249415, -80.56984524249415),
        (-358.1004453972281, 79.18995546027719, -79.18995546027719),
    ]]
    fillet(fillet6_edges, radius=FILLET6_R)

    # Fillet7
    fillet7_edges = [part.edges().sort_by_distance(p)[0] for p in [
        (-150, 0, 150),
        (-149.99999999999997, 150, 0),
        (0, -150, 150),
        (-150, -150, 0),
        (150, -149.99999999999997, 0),
        (149.99999999999997, 150.00000000000003, 0),
        (150, 2.842e-14, 150),
        (0, 150, 150),
        (0, 150, -150),
        (150, 2.842e-14, -150),
        (-150, 0, -150),
        (0, -150, -150),
    ]]
    fillet(fillet7_edges, radius=FILLET7_R)

    # Sketch5 → Boss-Extrude20 (add)
    with BuildSketch(Plane.XY.offset(100.00000000000023)):
        with Locations((-647.6342704776299, 0.9673939729716794)):
            Circle(SKETCH5_R)
    extrude(amount=BOSS_EXTRUDE20_DEPTH)

    # Fillet8
    # the kernel refuses this fillet: 90 mm, written as the material it takes off along each edge
    with BuildSketch(Plane(origin=(-647.6342704776299, 0.9673939729723777, 125.00000000000023), x_dir=(1, 0, 0), z_dir=(0, -1, 0))) as fillet8_piece_1:
        with BuildLine():
            CenterArc((0.25050201005626604, -90), FILLET8_R, 46.23825730732015, 43.76174269267985)
            Line((0.25050201005626604, 0), (0.25050201005626604, 1.7999999999999972))
            Line((0.25050201005626604, 1.7999999999999972), (62.5, 1.7999999999999972))
            Line((62.5, 1.7999999999999972), (64.29999999999995, 0))
            ThreePointArc((64.29999999999995, 0), (64.29999999999995, -12.500000000000028), (63.744989959798886, -23.700000000000045))
            Line((63.744989959798886, -23.700000000000045), (62.5, -25.000000000000043))
        make_face()
    revolve(axis=Axis((-647.6342704776299, 0.9673939729723777, 125.00000000000023), (0, 0, 1)), mode=Mode.SUBTRACT)

    # Sketch6 → Boss-Extrude21 (add)
    with BuildSketch(Plane.XY.offset(149.99999999999957)):
        Circle(SKETCH6_R)
    extrude(amount=BOSS_EXTRUDE21_DEPTH)

    # Fillet9
    # the kernel refuses this fillet: 160 mm, written as the material it takes off along each edge
    with BuildSketch(Plane(origin=(0, 0, 184.99999999999957), x_dir=(1, 0, 0), z_dir=(0, -1, 0))) as fillet9_piece_1:
        with BuildLine():
            CenterArc((0.12507822281143957, -160), FILLET9_R, 51.375167126947694, 38.624832873052306)
            Line((0.12507822281143957, 0), (0.12507822281143957, 3.1999999999999886))
            Line((0.12507822281143957, 3.1999999999999886), (100, 3.1999999999999886))
            Line((100, 3.1999999999999886), (103.2, 0))
            ThreePointArc((103.2, 0), (103.2, -17.49999999999943), (101.9974984355447, -32.499999999998835))
            Line((101.9974984355447, -32.499999999998835), (100.00000000000091, -34.99999999999886))
        make_face()
    revolve(axis=Axis((0, 0, 184.99999999999957), (0, 0, 1)), mode=Mode.SUBTRACT)


solid = part.part
